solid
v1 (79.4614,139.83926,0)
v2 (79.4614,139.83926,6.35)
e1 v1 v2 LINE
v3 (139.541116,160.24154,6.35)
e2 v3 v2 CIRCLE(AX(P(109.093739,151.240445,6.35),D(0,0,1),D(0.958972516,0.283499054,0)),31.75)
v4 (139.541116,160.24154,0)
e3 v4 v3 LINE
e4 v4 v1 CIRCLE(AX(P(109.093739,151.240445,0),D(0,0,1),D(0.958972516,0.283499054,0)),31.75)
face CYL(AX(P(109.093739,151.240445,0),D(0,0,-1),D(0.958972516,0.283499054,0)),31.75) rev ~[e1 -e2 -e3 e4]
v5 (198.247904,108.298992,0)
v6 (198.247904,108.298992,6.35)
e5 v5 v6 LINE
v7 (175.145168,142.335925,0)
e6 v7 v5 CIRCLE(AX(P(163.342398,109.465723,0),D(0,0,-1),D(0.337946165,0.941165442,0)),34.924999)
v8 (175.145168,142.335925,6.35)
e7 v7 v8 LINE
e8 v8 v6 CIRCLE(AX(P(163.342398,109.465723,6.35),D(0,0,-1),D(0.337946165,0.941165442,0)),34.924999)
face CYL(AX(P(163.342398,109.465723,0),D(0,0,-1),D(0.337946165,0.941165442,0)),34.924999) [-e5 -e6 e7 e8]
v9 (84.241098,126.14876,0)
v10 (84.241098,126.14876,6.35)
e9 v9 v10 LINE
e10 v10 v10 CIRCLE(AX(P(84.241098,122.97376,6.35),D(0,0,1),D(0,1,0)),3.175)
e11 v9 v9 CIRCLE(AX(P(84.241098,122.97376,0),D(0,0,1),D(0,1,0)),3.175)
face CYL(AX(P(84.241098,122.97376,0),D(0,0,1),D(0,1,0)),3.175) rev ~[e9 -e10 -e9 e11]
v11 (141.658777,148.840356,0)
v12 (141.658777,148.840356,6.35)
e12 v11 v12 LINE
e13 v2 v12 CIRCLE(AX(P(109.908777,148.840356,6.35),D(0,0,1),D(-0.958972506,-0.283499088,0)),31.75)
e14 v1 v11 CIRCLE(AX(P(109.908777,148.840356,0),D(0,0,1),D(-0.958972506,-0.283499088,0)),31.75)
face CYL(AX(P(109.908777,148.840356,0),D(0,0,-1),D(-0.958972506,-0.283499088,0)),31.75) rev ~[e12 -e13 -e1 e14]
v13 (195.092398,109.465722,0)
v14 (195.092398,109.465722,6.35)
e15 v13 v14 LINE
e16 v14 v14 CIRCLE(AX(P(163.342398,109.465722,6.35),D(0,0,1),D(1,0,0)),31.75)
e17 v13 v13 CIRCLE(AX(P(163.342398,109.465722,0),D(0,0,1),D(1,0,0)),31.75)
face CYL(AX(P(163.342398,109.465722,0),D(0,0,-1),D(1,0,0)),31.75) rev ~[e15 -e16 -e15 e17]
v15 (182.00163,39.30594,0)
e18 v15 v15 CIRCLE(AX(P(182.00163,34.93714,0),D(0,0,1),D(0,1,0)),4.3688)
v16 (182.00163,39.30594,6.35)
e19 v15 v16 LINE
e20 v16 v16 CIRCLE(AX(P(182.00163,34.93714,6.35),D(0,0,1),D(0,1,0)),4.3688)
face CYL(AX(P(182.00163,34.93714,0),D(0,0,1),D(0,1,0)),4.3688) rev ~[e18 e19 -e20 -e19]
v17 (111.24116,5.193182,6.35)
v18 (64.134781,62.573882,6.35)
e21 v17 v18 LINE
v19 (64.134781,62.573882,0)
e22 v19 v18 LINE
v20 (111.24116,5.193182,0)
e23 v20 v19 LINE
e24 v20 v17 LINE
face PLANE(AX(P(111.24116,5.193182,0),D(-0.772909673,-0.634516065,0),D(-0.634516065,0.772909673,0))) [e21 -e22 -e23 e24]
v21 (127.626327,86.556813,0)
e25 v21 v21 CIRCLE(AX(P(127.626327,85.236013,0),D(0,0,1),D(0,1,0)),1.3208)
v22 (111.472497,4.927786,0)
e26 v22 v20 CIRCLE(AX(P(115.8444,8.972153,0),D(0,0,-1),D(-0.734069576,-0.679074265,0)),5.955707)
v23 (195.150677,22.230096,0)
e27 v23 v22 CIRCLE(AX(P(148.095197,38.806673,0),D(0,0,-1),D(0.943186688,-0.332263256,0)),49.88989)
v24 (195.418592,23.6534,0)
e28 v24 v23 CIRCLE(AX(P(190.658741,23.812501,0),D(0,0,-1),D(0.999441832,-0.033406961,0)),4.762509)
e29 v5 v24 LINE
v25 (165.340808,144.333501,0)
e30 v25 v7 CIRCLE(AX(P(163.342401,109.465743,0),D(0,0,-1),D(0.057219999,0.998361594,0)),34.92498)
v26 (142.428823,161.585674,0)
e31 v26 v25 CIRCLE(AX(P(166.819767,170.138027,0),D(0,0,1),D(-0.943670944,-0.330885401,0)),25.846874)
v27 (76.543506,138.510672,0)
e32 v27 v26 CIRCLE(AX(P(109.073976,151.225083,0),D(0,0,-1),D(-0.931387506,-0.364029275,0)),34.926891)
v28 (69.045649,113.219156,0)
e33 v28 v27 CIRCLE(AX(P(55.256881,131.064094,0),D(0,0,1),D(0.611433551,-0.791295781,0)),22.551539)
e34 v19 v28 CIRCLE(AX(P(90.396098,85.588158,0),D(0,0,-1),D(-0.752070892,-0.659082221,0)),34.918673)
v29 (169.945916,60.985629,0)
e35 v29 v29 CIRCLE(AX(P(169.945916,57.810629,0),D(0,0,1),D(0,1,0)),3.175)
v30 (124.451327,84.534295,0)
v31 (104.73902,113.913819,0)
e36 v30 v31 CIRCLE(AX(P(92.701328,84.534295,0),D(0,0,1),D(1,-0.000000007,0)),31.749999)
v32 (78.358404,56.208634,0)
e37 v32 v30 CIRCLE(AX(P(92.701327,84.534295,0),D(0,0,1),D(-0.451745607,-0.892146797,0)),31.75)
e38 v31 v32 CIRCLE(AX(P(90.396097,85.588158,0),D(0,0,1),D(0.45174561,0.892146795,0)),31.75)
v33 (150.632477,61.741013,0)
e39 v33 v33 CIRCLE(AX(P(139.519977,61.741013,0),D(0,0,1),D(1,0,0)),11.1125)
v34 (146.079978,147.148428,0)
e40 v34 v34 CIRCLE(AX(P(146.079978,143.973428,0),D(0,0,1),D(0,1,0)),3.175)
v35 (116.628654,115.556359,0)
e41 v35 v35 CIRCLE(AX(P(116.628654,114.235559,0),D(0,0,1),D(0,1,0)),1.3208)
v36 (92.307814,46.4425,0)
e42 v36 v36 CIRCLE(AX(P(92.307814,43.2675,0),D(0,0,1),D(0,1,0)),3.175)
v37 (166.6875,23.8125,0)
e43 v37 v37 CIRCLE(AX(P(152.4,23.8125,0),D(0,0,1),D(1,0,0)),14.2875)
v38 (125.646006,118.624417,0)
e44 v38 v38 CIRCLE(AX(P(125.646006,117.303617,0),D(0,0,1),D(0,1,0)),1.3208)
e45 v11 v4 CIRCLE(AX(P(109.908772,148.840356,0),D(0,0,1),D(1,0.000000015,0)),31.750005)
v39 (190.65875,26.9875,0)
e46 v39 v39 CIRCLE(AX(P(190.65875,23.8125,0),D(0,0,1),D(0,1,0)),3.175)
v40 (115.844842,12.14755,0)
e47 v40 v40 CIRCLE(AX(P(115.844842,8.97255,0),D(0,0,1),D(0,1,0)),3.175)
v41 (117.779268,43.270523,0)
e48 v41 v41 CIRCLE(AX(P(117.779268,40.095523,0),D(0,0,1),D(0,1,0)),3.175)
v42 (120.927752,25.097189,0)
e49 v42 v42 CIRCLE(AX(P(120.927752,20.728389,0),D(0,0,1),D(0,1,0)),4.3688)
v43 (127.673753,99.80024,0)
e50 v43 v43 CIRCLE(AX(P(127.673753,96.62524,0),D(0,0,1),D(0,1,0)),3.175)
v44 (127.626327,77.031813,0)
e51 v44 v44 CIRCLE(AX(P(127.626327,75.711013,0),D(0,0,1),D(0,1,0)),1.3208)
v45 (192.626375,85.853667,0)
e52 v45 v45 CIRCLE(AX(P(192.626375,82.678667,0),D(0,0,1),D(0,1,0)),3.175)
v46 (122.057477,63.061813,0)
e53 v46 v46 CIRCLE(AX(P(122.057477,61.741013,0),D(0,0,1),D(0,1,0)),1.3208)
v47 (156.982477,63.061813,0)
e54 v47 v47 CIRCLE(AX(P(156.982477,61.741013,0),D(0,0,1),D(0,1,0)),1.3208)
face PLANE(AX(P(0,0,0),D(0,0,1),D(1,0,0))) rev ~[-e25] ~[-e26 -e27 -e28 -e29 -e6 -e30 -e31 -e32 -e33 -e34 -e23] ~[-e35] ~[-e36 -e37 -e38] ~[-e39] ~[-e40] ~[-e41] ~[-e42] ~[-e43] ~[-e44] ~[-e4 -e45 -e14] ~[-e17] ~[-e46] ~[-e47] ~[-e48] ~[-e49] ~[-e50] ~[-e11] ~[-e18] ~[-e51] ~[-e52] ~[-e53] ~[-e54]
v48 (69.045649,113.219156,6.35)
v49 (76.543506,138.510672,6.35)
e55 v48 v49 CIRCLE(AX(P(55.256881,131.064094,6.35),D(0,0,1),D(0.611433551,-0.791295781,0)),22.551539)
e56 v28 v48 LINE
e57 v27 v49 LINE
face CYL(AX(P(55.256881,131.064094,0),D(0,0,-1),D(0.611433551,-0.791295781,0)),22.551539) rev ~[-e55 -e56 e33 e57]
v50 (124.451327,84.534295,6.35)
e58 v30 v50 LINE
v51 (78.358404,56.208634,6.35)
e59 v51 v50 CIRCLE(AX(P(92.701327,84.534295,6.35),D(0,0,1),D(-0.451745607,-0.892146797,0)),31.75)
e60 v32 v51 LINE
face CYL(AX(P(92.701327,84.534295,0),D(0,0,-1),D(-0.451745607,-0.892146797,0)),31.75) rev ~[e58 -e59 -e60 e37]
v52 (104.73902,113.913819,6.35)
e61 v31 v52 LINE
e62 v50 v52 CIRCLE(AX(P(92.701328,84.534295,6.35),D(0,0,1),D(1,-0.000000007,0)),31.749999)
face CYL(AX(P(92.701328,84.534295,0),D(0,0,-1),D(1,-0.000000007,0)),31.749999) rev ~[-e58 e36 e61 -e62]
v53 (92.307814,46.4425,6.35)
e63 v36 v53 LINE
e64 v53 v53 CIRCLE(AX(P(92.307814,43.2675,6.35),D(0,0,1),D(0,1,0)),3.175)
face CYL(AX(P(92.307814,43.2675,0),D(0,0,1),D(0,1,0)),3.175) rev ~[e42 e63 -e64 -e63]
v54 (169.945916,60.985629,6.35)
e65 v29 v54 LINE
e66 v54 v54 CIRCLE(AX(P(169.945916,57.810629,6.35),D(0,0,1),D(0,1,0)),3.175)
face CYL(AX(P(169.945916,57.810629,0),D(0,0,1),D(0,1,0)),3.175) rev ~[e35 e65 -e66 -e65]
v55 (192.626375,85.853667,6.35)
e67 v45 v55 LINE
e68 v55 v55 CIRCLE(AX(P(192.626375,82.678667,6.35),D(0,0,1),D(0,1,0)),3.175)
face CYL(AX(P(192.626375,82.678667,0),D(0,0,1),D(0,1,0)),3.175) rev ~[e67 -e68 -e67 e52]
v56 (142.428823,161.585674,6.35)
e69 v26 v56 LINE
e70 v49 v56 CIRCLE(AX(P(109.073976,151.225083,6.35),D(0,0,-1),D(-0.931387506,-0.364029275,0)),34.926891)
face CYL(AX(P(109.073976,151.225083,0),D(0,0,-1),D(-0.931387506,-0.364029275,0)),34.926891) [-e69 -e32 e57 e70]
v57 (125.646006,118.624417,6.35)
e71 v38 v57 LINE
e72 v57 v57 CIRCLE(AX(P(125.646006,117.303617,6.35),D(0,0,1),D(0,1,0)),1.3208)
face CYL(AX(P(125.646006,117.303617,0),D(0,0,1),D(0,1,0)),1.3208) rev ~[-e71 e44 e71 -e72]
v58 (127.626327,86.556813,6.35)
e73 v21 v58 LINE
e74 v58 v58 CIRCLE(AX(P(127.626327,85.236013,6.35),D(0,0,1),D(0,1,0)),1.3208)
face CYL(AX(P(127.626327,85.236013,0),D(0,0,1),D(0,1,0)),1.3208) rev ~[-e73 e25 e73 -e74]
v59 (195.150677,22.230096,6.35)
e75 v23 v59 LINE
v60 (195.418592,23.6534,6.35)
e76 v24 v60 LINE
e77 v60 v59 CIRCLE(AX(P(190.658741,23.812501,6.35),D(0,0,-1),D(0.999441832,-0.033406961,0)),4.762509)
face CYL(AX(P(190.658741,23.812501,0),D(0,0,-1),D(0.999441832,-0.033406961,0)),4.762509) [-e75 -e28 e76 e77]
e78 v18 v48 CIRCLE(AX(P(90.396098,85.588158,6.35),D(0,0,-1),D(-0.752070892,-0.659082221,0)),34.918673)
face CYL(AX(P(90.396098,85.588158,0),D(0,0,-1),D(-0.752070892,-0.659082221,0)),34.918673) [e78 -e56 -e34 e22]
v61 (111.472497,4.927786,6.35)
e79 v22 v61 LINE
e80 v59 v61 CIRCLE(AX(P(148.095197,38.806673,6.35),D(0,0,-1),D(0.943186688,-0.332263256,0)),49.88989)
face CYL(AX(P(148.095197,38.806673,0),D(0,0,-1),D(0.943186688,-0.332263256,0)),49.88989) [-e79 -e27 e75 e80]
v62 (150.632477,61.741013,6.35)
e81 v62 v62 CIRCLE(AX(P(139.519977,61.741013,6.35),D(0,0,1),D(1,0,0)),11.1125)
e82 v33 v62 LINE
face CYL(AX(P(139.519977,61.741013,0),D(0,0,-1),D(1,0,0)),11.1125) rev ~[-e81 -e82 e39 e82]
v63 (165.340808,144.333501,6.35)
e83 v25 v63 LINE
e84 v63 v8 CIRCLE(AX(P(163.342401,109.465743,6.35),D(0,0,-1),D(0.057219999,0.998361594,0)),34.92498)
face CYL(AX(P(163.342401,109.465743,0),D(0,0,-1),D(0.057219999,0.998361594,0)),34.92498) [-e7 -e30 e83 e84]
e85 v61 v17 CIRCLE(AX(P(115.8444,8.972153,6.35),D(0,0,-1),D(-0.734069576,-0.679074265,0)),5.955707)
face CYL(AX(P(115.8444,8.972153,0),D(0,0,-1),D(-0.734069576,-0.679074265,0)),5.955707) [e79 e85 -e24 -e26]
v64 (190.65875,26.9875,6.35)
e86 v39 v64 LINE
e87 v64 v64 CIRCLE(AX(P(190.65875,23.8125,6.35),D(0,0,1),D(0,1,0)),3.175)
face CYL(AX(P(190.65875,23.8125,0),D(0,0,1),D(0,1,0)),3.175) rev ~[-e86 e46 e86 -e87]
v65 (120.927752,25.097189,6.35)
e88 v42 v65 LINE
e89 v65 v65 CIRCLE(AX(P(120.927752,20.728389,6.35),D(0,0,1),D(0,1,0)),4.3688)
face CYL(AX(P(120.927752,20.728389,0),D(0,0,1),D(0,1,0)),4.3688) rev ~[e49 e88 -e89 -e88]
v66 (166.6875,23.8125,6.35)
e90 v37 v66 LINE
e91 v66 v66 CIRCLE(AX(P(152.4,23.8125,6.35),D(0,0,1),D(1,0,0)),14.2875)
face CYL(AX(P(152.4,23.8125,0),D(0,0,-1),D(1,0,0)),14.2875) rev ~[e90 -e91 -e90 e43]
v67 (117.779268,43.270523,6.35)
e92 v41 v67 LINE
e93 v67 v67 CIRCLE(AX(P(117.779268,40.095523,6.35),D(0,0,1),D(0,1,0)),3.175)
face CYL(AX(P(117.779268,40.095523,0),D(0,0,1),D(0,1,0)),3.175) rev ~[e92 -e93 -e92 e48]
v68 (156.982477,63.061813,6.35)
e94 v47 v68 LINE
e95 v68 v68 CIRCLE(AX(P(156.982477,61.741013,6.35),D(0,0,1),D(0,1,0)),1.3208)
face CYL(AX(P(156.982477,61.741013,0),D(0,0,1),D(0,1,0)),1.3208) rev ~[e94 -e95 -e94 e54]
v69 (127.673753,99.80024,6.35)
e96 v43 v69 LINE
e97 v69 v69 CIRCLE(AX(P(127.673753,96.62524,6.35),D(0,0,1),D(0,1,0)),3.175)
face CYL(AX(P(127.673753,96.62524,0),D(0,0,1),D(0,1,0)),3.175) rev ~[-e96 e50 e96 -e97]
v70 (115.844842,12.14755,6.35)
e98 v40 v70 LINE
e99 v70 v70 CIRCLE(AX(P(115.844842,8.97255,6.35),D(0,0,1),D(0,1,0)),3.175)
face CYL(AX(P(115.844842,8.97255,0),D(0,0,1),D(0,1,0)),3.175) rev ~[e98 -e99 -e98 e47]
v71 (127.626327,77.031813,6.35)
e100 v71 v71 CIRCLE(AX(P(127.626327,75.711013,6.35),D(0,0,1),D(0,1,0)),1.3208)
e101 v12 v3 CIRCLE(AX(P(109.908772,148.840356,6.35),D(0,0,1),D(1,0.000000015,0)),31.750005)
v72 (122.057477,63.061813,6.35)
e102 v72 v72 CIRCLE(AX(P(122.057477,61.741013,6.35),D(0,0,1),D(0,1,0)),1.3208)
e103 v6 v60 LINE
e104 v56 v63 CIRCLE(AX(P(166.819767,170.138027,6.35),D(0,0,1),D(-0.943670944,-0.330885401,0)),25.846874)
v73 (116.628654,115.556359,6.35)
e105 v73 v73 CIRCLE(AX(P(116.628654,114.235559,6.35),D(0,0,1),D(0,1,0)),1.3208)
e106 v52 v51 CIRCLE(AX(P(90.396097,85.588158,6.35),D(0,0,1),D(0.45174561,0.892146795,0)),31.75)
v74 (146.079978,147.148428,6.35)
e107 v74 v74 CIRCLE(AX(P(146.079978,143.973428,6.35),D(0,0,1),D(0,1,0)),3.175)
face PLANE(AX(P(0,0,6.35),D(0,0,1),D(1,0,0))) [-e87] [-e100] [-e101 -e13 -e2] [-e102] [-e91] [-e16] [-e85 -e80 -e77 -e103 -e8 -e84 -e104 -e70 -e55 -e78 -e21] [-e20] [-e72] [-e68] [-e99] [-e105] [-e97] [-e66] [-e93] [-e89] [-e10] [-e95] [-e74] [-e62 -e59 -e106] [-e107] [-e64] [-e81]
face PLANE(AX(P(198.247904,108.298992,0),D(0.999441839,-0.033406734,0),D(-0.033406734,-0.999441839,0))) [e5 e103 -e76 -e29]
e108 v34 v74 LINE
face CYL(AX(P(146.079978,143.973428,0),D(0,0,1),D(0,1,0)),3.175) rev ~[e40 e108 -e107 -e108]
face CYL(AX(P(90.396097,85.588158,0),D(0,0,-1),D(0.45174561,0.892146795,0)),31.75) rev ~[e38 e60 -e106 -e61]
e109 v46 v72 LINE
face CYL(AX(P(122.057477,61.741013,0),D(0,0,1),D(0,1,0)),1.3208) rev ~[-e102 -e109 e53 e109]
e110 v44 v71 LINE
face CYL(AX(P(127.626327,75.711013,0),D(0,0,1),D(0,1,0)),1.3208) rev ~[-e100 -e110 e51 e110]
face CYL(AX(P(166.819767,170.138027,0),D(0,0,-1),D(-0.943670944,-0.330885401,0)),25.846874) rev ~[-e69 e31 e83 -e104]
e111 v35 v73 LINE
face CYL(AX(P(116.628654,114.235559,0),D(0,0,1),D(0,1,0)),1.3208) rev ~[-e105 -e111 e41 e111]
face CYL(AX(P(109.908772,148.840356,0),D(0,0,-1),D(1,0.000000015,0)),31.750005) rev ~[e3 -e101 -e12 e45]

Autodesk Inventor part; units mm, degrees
ref_plane "YZ Plane" through (0, 0, 0) normal (1, 0, 0) x (0, 1, 0)
ref_plane "XZ Plane" through (0, 0, 0) normal (0, 1, 0) x (-1, 0, 0)
ref_plane "XY Plane" through (0, 0, 0) normal (0, 0, 1) x (1, 0, 0)
sketch "Sketch1" plane through (0, 0, 0) normal (0, 0, 1) x (1, 0, 0)
  line L0 (0, 0) -> (304.8, 0) construction
  line L1 (304.8, 0) -> (304.8, 50.8) construction
  line L2 (304.8, 50.8) -> (0, 50.8) construction
  line L3 (0, 50.8) -> (0, 0) construction
  circle A0 centre (152.4, 23.8125) radius 14.2875
  circle A1 centre (152.4, 23.8125) radius 34.29 construction
  circle A2 centre (152.4, 23.8125) radius 26.035 construction
  line L4 (152.4, 23.8125) -> (139.519977, 61.741013) construction
  circle A3 centre (139.519977, 61.741013) radius 9.525 construction
  circle A4 centre (139.519977, 61.741013) radius 17.78 construction
  circle A5 centre (91.561866, 85.09) radius 31.75 construction
  circle A6 centre (163.342398, 109.465722) radius 31.75
  circle A7 centre (109.531215, 150.050573) radius 31.75 construction
  line L5 (0, 50.8) -> (0, 53.34) construction
  line L6 (0, 53.34) -> (304.8, 53.34) construction
  line L7 (304.8, 53.34) -> (304.8, 50.8) construction
  circle A8 centre (139.519977, 61.741013) radius 21.59 construction
  circle A9 centre (152.4, 23.8125) radius 46.99 construction
  circle A10 centre (152.4, 23.8125) radius 50.8 construction
  arc A11 (86.386473, 79.456368) -> (92.43632, 92.689857) centre (91.561866, 85.09) ccw construction
  circle A12 centre (163.342398, 109.465722) radius 7.65 construction
  arc A13 (116.774938, 152.510446) -> (102.287492, 147.5907) centre (109.531215, 150.050573) ccw construction
  circle A14 centre (139.519977, 61.741013) radius 22.9 construction
  line L8 (86.386473, 79.456368) -> (124.027623, 44.87694) construction
  line L9 (170.878164, 108.148633) -> (162.078023, 57.798354) construction
  line L10 (92.43632, 92.689857) -> (91.561866, 85.09) construction
  line L11 (91.561866, 85.09) -> (86.386473, 79.456368) construction
  circle A15 centre (127.673753, 96.62524) radius 3.175 construction
  circle A16 centre (127.673753, 96.62524) radius 7.9375 construction
  line L12 (92.43632, 92.689857) -> (126.766436, 88.739767) construction
  line L13 (133.195304, 90.922926) -> (158.02084, 114.961496) construction
  line L14 (158.02084, 114.961496) -> (163.342398, 109.465722) construction
  line L15 (170.878164, 108.148633) -> (163.342398, 109.465722) construction
  line L16 (139.519977, 61.741013) -> (127.673753, 96.62524) construction
  line L17 (91.561866, 85.09) -> (163.342398, 109.465722) construction
  line L18 (152.4, 23.8125) -> (91.561866, 85.09) construction
  line L19 (152.4, 23.8125) -> (163.342398, 109.465722) construction
  circle A17 centre (127.673753, 96.62524) radius 9.2075 construction
  circle A18 centre (127.673753, 96.62524) radius 6.1595 construction
  arc A19 (92.43632, 92.689857) -> (86.386473, 79.456368) centre (91.561866, 85.09) ccw construction
  circle A20 centre (163.342398, 109.465722) radius 25.4 construction
  circle A21 centre (109.531215, 150.050573) radius 25.4 construction
  line L20 (104.762695, 113.965606) -> (78.361037, 56.214394) construction
  circle A22 centre (91.561866, 85.09) radius 25.4 construction
  line L21 (139.595033, 160.25985) -> (79.467396, 139.841297) construction
  circle A23 centre (139.519977, 61.741013) radius 11.1125
  arc A24 (100.137329, 146.057477) -> (119.680223, 151.623238) centre (109.908777, 148.840356) ccw construction
  line L22 (109.093738, 151.240444) -> (85.48016, 141.883152) construction
  line L23 (109.908777, 148.840356) -> (85.48016, 141.883152) construction
  line L24 (109.093738, 151.240444) -> (132.707317, 160.597736) construction
  line L25 (109.908777, 148.840356) -> (134.337393, 155.79756) construction
  arc A25 (134.92109, 161.474983) -> (130.493544, 159.72049) centre (132.707317, 160.597736) ccw construction
  arc A26 (132.04721, 155.145323) -> (136.627576, 156.449798) centre (134.337393, 155.79756) ccw construction
  arc A27 (132.04721, 155.145323) -> (130.493544, 159.72049) centre (85.48016, 141.883152) ccw construction
  arc A28 (136.627576, 156.449798) -> (134.92109, 161.474983) centre (85.48016, 141.883152) ccw construction
  line L26 (132.707317, 160.597736) -> (134.92109, 161.474983) construction
  line L27 (134.337393, 155.79756) -> (136.627576, 156.449798) construction
  arc A29 (119.680223, 151.623238) -> (118.53917, 154.983361) centre (85.48016, 141.883152) ccw construction
  arc A30 (100.137329, 146.057477) -> (99.648307, 147.497527) centre (85.48016, 141.883152) ccw construction
  line L28 (104.40145, 107.079075) -> (92.701327, 84.534295) construction
  line L29 (81.001203, 61.989515) -> (90.396097, 85.588158) construction
  arc A31 (100.671763, 111.399174) -> (98.91022, 106.974429) centre (99.790992, 109.186802) ccw construction
  arc A32 (103.304563, 104.965502) -> (105.498337, 109.192648) centre (104.40145, 107.079075) ccw construction
  arc A33 (103.304563, 104.965502) -> (98.91022, 106.974429) centre (81.001203, 61.989515) ccw construction
  line L30 (99.790992, 109.186802) -> (100.671763, 111.399174) construction
  line L31 (104.40145, 107.079075) -> (105.498337, 109.192648) construction
  arc A34 (105.498337, 109.192648) -> (100.671763, 111.399174) centre (81.001203, 61.989515) ccw construction
  arc A35 (118.53917, 154.983361) -> (99.648307, 147.497527) centre (109.093738, 151.240444) ccw construction
  arc A36 (88.021277, 75.516384) -> (97.381377, 93.552207) centre (92.701327, 84.534295) ccw construction
  line L32 (90.396097, 85.588158) -> (99.790992, 109.186802) construction
  line L33 (92.701327, 84.534295) -> (81.001203, 61.989515) construction
  arc A37 (88.021277, 75.516384) -> (86.63814, 76.148701) centre (81.001203, 61.989515) ccw construction
  arc A38 (97.381377, 93.552207) -> (94.154055, 95.027616) centre (81.001203, 61.989515) ccw construction
  arc A39 (94.154055, 95.027616) -> (86.63814, 76.148701) centre (90.396097, 85.588158) ccw construction
  line L34 (163.342398, 109.465722) -> (140.898549, 121.35831) construction
  line L35 (163.342398, 109.465722) -> (185.786247, 97.573135) construction
  circle A40 centre (139.519977, 61.741013) radius 22.9 construction
  arc A41 (102.287492, 147.5907) -> (116.774938, 152.510446) centre (109.531215, 150.050573) ccw construction
  arc A42 (102.287492, 147.5907) -> (102.622578, 146.765267) centre (109.531215, 150.050573) ccw construction
  circle A43 centre (90.396097, 85.588158) radius 31.75
  circle A44 centre (92.701327, 84.534295) radius 31.75
  line L36 (100.671763, 111.399174) -> (102.139715, 115.086462) construction
  line L37 (105.498337, 109.192648) -> (107.326481, 112.71527) construction
  arc A45 (107.326481, 112.71527) -> (102.139715, 115.086462) centre (81.001203, 61.989515) ccw
  circle A46 centre (109.093738, 151.240444) radius 31.75
  circle A47 centre (109.908777, 148.840356) radius 31.75
  line L38 (134.92109, 161.474983) -> (138.610711, 162.93706) construction
  line L39 (136.627576, 156.449798) -> (140.444547, 157.536861) construction
  arc A48 (140.444547, 157.536861) -> (138.610711, 162.93706) centre (85.48016, 141.883152) ccw
  line L40 (91.561866, 85.09) -> (109.531215, 150.050573) construction
  line L41 (109.531215, 150.050573) -> (163.342398, 109.465722) construction
  line L42 (139.519977, 61.741013) -> (109.531215, 150.050573) construction
  circle A49 centre (139.519977, 61.741013) radius 17.4625
  line L43 (139.519977, 61.741013) -> (122.057477, 61.741013) construction
  line L44 (139.519977, 61.741013) -> (156.982477, 61.741013) construction
  line L45 (139.519977, 61.741013) -> (156.982477, 61.741013) construction
  circle A50 centre (139.519977, 61.741013) radius 26.71 construction
  circle A51 centre (117.779268, 40.095523) radius 3.96875 construction
  circle A52 centre (169.945916, 57.810629) radius 3.96875 construction
  circle A53 centre (84.241098, 122.97376) radius 3.175
  circle A54 centre (146.079978, 143.973428) radius 3.175
  line L46 (84.241098, 122.97376) -> (127.673753, 96.62524)
  line L47 (127.673753, 96.62524) -> (146.079978, 143.973428)
  line L48 (0, 3.81) -> (304.8, 3.81) construction
  arc A55 (86.506583, 75.488588) -> (95.723262, 93.598122) centre (91.114923, 84.543355) ccw
  arc A56 (92.484334, 95.047874) -> (85.118472, 76.10991) centre (88.801403, 85.578892) ccw
  arc A57 (95.723262, 93.598122) -> (92.484334, 95.047874) centre (79.594076, 61.906436) ccw
  circle A58 centre (120.927752, 20.728389) radius 5.588
  circle A59 centre (182.00163, 34.93714) radius 5.588
  line L49 (152.4, 23.8125) -> (304.8, 25.4) construction
  line L50 (182.00163, 34.93714) -> (152.4, 23.8125) construction
  line L51 (152.4, 23.8125) -> (120.927752, 20.728389) construction
  arc A60 (69.045649, 113.219156) -> (76.543506, 138.510672) centre (55.256881, 131.064094) ccw
  line L52 (64.134781, 62.573882) -> (111.24116, 5.193182)
  arc A61 (69.045649, 113.219156) -> (64.134781, 62.573882) centre (90.396097, 85.588158) ccw
  arc A62 (142.428823, 161.585674) -> (165.340808, 144.333501) centre (166.819768, 170.138028) ccw
  arc A63 (175.145168, 142.335925) -> (165.340808, 144.333501) centre (163.342398, 109.465722) ccw
  line L53 (198.247904, 108.298992) -> (195.418592, 23.6534)
  arc A64 (111.24116, 5.193182) -> (111.472497, 4.927786) centre (115.844842, 8.97255) ccw
  arc A65 (111.472497, 4.927786) -> (195.150677, 22.230096) centre (148.095197, 38.806673) ccw
  arc A66 (195.150677, 22.230096) -> (195.418592, 23.6534) centre (190.65875, 23.8125) ccw
  arc A67 (198.247904, 108.298992) -> (175.145168, 142.335925) centre (163.342398, 109.465722) ccw
  arc A68 (142.428823, 161.585674) -> (76.543506, 138.510672) centre (109.073975, 151.225083) ccw
  point P0 (133.582269, 158.217994)
  point P1 (102.122529, 108.190485)
  point P2 (192.626375, 82.678667)
  point P3 (92.307814, 43.2675)
  dimension "d114" = 63.5
  dimension "d115" = 63.5
  dimension "d122" = 63.5
  dimension "d123" = 63.5
  dimension "d1" = 50.8
  dimension "d2" = 28.575
  dimension "d3" = 23.8125
  dimension "d4" = 152.4
  dimension "d7" = 68.58
  dimension "d8" = 52.07
  dimension "d9" = 19.05
  dimension "d10" = 35.56
  dimension "d11" = 40.0558
  dimension "d12" = 63.5
  dimension "d13" = 63.5
  dimension "d14" = 63.5
  dimension "d15" = 2.54
  dimension "d16" = 304.8
  dimension "d17" = 43.18
  dimension "d18" = 93.98
  dimension "d19" = 101.6
  dimension "d21" = 15.3
  dimension "d22" = 15.3
  dimension "d29" = 45.8
  dimension "d30" = 143.991
  dimension "d31" = 6.35
  dimension "d32" = 15.875
  dimension "d33" = 143.991
  dimension "d35" = 18.415
  dimension "d37" = 12.319
  dimension "d40" = 50.8
  dimension "d41" = 50.8
  dimension "d42" = 18.0044
  dimension "d43" = 18.0044
  dimension "d44" = 50.8
  dimension "d57" = 22.225
  dimension "d67" = 25.4
  dimension "d68" = 25.4
  dimension "d69" = 2.86
  dimension "d70" = 25.4
  dimension "d71" = 25.4
  dimension "d72" = 4.7625
  dimension "d75" = 2.86
  dimension "d80" = 4.7625
  dimension "d82" = 4.7625
  dimension "d83" = 50.8
  dimension "d84" = 50.8
  dimension "d85" = 10.16
  dimension "d97" = 48.41875
  dimension "d99" = 20.32
  dimension "d101" = 25.4
  dimension "d102" = 25.4
  dimension "d103" = 10.16
  dimension "d105" = 18.0044
  dimension "d106" = 18.0044
  dimension "d107" = 45.8
  dimension "d109" = 7.65
  dimension "d116" = 57.15
  dimension "d128" = 93.26256
  dimension "d129" = 34.925
  dimension "d130" = 0
  dimension "d138" = 53.42
  dimension "d139" = 7.9375
  dimension "d140" = 7.9375
  dimension "d148" = 6.35
  dimension "d149" = 6.35
  dimension "d150" = 40
  dimension "d151" = 40
sketch "Sketch1 outline for Extrusion3" plane through (0, 0, 0) normal (0, 0, 1) x (1, 0, 0)
  arc A0 (69.045649, 113.219156) -> (76.543506, 138.510672) centre (55.256881, 131.064094) ccw
  arc A1 (64.134781, 62.573882) -> (69.045649, 113.219156) centre (90.396097, 85.588158) cw
  arc A2 (76.543506, 138.510672) -> (142.428823, 161.585674) centre (109.073975, 151.225083) cw
  line L0 (111.24116, 5.193182) -> (64.134781, 62.573882)
  arc A3 (142.428823, 161.585674) -> (165.340808, 144.333501) centre (166.819768, 170.138028) ccw
  arc A4 (111.472497, 4.927786) -> (111.24116, 5.193182) centre (115.844842, 8.97255) cw
  arc A5 (165.340808, 144.333501) -> (175.145168, 142.335925) centre (163.342398, 109.465722) cw
  arc A6 (195.150677, 22.230096) -> (111.472497, 4.927786) centre (148.095197, 38.806673) cw
  arc A7 (175.145168, 142.335925) -> (198.247904, 108.298992) centre (163.342398, 109.465722) cw
  arc A8 (195.418592, 23.6534) -> (195.150677, 22.230096) centre (190.65875, 23.8125) cw
  line L1 (198.247904, 108.298992) -> (195.418592, 23.6534)
  arc A9 (124.451327, 84.534295) -> (104.73902, 113.913819) centre (92.701327, 84.534295) ccw
  arc A10 (104.73902, 113.913819) -> (78.358404, 56.208634) centre (90.396097, 85.588158) ccw
  arc A11 (78.358404, 56.208634) -> (124.451327, 84.534295) centre (92.701327, 84.534295) ccw
  circle A12 centre (152.4, 23.8125) radius 14.2875
  circle A13 centre (139.519977, 61.741013) radius 11.1125
  arc A14 (141.658777, 148.840356) -> (139.541116, 160.24154) centre (109.908777, 148.840356) ccw
  arc A15 (139.541116, 160.24154) -> (79.4614, 139.83926) centre (109.093738, 151.240444) ccw
  arc A16 (79.4614, 139.83926) -> (141.658777, 148.840356) centre (109.908777, 148.840356) ccw
  circle A17 centre (163.342398, 109.465722) radius 31.75
extrude "Extrusion3" add sketch "Sketch1 outline for Extrusion3" along normal blind 6.35
hole "Encoder Mounting Holes" at (122.057477, 61.741013, 0) at (156.982477, 61.741013, 0) direction (0, 0, 1) diameter 2.6416 end through all thread size "6-32 UNC" class "2B" standard "ANSI Unified Screw Threads"
hole "10-32 Pem Nut Holes" at (81.001203, 61.989515, 0) at (85.48016, 141.883152, 0) at (100.671763, 111.399174, 0) at (105.498337, 109.192648, 0) at (102.122529, 108.190485, 0) at (127.673753, 96.62524, 0) at (117.779268, 40.095523, 0) at (169.945916, 57.810629, 0) at (146.079978, 143.973428, 0) at (84.241098, 122.97376, 0) at (115.844842, 8.97255, 0) at (190.65875, 23.8125, 0) at (192.626375, 82.678667, 0) at (92.307814, 43.2675, 0) direction (0, 0, 1) diameter 6.35 end through all
hole "1/4-20 Pem Nut Holes" at (185.786247, 97.573135, 0) at (140.898549, 121.35831, 0) at (120.927752, 20.728389, 0) at (182.00163, 34.93714, 0) at (133.582269, 158.217994, 0) direction (0, 0, 1) diameter 8.7376 end through all
sketch "Sketch5" plane through (0, 0, 0) normal (0, 0, -1) x (-1, 0, 0)
  circle A0 centre (-139.519977, 61.741013) radius 11.1125
  arc A1 (-78.358404, 56.208634) -> (-104.73902, 113.913819) centre (-90.396097, 85.588158) ccw
  arc A2 (-104.73902, 113.913819) -> (-78.358404, 56.208634) centre (-92.701327, 84.534295) ccw
  line L0 (-121.576933, 71.333467) -> (-61.520491, 98.788987) construction
  line L1 (-124.451327, 85.236013) -> (-124.451327, 75.711013)
  line L2 (-124.451327, 85.236013) -> (-127.626327, 85.236013)
  line L3 (-127.626327, 85.236013) -> (-127.626327, 75.711013)
  line L4 (-127.626327, 75.711013) -> (-124.451327, 75.711013)
  arc A3 (-139.541116, 160.24154) -> (-79.4614, 139.83926) centre (-109.908777, 148.840356) ccw
  line L5 (-139.519977, 61.741013) -> (-109.073975, 151.225083) construction
  line L6 (-124.62332, 120.309401) -> (-115.605968, 117.241343) construction
  line L7 (-124.62332, 120.309401) -> (-125.646006, 117.303617) construction
  line L8 (-125.646006, 117.303617) -> (-116.628654, 114.235559) construction
  line L9 (-116.628654, 114.235559) -> (-115.605968, 117.241343) construction
  arc A4 (-76.543506, 138.510672) -> (-142.428823, 161.585674) centre (-109.073975, 151.225083) ccw
  point P0 (0, 0)
  dimension "d196" = 9.525
  dimension "d198" = 3.175
  dimension "d201" = 13.97
  dimension "d209" = 9.525
  dimension "d210" = 3.175
hole "Cim Adjustment Block Holes" at (127.626327, 85.236013, 0) at (127.626327, 75.711013, 0) at (125.646006, 117.303617, 0) at (116.628654, 114.235559, 0) direction (0, 0, 1) diameter 2.6416 end through all thread size "6-32 UNC" class "2B" standard "ANSI Unified Screw Threads"
equation "\"d9\" = Gear15tPD"
equation "\"d10\" = Gear28tPD"
equation "\"d11\" = 0.5 * Gear48tPD + 0.5 * Gear15tPD + MeshingClearance"
equation "\"d12\" = CimOD"
equation "\"d13\" = CimOD"
equation "\"d14\" = CimOD"
equation "\"d17\" = Gear28tPD + ClearanceDiameter"
equation "\"d18\" = WheelOD"
equation "\"d19\" = WheelClearance"
equation "\"Pulley48tPD\" = 45.8"
equation "\"Pulley19tPD\" = 18.2"
equation "\"Pulley16tPD\" = 15.3"
equation "\"Gear15tPD\" = 19.05"
equation "\"Gear35tPD\" = 44.45"
equation "\"Gear48tPD\" = 60.96"
equation "\"Gear28tPD\" = 35.56"
equation "\"BearingLargeOD\" = 28.575"
equation "\"BearingSmallOD\" = 22.225"
equation "\"MeshingClearance\" = 0.0508"
equation "\"CimOD\" = 63.5"
equation "\"WheelOD\" = 93.98"
equation "\"ClearanceDiameter\" = 7.62"
equation "\"WheelClearance\" = 101.6"
equation "\"TensioningBearingID\" = 6.35"
equation "\"TensioningBearingOD\" = 15.875"
equation "\"SpingClipClearance\" = 8.89"
equation "\"Pi\" = 79.79645"
equation "\"Pulley56tPD\" = 53.5"
equation "\"BearingXLargeOD\" = 34.925"
properties part number "OutlineSketch1" material "Aluminum 6061"
